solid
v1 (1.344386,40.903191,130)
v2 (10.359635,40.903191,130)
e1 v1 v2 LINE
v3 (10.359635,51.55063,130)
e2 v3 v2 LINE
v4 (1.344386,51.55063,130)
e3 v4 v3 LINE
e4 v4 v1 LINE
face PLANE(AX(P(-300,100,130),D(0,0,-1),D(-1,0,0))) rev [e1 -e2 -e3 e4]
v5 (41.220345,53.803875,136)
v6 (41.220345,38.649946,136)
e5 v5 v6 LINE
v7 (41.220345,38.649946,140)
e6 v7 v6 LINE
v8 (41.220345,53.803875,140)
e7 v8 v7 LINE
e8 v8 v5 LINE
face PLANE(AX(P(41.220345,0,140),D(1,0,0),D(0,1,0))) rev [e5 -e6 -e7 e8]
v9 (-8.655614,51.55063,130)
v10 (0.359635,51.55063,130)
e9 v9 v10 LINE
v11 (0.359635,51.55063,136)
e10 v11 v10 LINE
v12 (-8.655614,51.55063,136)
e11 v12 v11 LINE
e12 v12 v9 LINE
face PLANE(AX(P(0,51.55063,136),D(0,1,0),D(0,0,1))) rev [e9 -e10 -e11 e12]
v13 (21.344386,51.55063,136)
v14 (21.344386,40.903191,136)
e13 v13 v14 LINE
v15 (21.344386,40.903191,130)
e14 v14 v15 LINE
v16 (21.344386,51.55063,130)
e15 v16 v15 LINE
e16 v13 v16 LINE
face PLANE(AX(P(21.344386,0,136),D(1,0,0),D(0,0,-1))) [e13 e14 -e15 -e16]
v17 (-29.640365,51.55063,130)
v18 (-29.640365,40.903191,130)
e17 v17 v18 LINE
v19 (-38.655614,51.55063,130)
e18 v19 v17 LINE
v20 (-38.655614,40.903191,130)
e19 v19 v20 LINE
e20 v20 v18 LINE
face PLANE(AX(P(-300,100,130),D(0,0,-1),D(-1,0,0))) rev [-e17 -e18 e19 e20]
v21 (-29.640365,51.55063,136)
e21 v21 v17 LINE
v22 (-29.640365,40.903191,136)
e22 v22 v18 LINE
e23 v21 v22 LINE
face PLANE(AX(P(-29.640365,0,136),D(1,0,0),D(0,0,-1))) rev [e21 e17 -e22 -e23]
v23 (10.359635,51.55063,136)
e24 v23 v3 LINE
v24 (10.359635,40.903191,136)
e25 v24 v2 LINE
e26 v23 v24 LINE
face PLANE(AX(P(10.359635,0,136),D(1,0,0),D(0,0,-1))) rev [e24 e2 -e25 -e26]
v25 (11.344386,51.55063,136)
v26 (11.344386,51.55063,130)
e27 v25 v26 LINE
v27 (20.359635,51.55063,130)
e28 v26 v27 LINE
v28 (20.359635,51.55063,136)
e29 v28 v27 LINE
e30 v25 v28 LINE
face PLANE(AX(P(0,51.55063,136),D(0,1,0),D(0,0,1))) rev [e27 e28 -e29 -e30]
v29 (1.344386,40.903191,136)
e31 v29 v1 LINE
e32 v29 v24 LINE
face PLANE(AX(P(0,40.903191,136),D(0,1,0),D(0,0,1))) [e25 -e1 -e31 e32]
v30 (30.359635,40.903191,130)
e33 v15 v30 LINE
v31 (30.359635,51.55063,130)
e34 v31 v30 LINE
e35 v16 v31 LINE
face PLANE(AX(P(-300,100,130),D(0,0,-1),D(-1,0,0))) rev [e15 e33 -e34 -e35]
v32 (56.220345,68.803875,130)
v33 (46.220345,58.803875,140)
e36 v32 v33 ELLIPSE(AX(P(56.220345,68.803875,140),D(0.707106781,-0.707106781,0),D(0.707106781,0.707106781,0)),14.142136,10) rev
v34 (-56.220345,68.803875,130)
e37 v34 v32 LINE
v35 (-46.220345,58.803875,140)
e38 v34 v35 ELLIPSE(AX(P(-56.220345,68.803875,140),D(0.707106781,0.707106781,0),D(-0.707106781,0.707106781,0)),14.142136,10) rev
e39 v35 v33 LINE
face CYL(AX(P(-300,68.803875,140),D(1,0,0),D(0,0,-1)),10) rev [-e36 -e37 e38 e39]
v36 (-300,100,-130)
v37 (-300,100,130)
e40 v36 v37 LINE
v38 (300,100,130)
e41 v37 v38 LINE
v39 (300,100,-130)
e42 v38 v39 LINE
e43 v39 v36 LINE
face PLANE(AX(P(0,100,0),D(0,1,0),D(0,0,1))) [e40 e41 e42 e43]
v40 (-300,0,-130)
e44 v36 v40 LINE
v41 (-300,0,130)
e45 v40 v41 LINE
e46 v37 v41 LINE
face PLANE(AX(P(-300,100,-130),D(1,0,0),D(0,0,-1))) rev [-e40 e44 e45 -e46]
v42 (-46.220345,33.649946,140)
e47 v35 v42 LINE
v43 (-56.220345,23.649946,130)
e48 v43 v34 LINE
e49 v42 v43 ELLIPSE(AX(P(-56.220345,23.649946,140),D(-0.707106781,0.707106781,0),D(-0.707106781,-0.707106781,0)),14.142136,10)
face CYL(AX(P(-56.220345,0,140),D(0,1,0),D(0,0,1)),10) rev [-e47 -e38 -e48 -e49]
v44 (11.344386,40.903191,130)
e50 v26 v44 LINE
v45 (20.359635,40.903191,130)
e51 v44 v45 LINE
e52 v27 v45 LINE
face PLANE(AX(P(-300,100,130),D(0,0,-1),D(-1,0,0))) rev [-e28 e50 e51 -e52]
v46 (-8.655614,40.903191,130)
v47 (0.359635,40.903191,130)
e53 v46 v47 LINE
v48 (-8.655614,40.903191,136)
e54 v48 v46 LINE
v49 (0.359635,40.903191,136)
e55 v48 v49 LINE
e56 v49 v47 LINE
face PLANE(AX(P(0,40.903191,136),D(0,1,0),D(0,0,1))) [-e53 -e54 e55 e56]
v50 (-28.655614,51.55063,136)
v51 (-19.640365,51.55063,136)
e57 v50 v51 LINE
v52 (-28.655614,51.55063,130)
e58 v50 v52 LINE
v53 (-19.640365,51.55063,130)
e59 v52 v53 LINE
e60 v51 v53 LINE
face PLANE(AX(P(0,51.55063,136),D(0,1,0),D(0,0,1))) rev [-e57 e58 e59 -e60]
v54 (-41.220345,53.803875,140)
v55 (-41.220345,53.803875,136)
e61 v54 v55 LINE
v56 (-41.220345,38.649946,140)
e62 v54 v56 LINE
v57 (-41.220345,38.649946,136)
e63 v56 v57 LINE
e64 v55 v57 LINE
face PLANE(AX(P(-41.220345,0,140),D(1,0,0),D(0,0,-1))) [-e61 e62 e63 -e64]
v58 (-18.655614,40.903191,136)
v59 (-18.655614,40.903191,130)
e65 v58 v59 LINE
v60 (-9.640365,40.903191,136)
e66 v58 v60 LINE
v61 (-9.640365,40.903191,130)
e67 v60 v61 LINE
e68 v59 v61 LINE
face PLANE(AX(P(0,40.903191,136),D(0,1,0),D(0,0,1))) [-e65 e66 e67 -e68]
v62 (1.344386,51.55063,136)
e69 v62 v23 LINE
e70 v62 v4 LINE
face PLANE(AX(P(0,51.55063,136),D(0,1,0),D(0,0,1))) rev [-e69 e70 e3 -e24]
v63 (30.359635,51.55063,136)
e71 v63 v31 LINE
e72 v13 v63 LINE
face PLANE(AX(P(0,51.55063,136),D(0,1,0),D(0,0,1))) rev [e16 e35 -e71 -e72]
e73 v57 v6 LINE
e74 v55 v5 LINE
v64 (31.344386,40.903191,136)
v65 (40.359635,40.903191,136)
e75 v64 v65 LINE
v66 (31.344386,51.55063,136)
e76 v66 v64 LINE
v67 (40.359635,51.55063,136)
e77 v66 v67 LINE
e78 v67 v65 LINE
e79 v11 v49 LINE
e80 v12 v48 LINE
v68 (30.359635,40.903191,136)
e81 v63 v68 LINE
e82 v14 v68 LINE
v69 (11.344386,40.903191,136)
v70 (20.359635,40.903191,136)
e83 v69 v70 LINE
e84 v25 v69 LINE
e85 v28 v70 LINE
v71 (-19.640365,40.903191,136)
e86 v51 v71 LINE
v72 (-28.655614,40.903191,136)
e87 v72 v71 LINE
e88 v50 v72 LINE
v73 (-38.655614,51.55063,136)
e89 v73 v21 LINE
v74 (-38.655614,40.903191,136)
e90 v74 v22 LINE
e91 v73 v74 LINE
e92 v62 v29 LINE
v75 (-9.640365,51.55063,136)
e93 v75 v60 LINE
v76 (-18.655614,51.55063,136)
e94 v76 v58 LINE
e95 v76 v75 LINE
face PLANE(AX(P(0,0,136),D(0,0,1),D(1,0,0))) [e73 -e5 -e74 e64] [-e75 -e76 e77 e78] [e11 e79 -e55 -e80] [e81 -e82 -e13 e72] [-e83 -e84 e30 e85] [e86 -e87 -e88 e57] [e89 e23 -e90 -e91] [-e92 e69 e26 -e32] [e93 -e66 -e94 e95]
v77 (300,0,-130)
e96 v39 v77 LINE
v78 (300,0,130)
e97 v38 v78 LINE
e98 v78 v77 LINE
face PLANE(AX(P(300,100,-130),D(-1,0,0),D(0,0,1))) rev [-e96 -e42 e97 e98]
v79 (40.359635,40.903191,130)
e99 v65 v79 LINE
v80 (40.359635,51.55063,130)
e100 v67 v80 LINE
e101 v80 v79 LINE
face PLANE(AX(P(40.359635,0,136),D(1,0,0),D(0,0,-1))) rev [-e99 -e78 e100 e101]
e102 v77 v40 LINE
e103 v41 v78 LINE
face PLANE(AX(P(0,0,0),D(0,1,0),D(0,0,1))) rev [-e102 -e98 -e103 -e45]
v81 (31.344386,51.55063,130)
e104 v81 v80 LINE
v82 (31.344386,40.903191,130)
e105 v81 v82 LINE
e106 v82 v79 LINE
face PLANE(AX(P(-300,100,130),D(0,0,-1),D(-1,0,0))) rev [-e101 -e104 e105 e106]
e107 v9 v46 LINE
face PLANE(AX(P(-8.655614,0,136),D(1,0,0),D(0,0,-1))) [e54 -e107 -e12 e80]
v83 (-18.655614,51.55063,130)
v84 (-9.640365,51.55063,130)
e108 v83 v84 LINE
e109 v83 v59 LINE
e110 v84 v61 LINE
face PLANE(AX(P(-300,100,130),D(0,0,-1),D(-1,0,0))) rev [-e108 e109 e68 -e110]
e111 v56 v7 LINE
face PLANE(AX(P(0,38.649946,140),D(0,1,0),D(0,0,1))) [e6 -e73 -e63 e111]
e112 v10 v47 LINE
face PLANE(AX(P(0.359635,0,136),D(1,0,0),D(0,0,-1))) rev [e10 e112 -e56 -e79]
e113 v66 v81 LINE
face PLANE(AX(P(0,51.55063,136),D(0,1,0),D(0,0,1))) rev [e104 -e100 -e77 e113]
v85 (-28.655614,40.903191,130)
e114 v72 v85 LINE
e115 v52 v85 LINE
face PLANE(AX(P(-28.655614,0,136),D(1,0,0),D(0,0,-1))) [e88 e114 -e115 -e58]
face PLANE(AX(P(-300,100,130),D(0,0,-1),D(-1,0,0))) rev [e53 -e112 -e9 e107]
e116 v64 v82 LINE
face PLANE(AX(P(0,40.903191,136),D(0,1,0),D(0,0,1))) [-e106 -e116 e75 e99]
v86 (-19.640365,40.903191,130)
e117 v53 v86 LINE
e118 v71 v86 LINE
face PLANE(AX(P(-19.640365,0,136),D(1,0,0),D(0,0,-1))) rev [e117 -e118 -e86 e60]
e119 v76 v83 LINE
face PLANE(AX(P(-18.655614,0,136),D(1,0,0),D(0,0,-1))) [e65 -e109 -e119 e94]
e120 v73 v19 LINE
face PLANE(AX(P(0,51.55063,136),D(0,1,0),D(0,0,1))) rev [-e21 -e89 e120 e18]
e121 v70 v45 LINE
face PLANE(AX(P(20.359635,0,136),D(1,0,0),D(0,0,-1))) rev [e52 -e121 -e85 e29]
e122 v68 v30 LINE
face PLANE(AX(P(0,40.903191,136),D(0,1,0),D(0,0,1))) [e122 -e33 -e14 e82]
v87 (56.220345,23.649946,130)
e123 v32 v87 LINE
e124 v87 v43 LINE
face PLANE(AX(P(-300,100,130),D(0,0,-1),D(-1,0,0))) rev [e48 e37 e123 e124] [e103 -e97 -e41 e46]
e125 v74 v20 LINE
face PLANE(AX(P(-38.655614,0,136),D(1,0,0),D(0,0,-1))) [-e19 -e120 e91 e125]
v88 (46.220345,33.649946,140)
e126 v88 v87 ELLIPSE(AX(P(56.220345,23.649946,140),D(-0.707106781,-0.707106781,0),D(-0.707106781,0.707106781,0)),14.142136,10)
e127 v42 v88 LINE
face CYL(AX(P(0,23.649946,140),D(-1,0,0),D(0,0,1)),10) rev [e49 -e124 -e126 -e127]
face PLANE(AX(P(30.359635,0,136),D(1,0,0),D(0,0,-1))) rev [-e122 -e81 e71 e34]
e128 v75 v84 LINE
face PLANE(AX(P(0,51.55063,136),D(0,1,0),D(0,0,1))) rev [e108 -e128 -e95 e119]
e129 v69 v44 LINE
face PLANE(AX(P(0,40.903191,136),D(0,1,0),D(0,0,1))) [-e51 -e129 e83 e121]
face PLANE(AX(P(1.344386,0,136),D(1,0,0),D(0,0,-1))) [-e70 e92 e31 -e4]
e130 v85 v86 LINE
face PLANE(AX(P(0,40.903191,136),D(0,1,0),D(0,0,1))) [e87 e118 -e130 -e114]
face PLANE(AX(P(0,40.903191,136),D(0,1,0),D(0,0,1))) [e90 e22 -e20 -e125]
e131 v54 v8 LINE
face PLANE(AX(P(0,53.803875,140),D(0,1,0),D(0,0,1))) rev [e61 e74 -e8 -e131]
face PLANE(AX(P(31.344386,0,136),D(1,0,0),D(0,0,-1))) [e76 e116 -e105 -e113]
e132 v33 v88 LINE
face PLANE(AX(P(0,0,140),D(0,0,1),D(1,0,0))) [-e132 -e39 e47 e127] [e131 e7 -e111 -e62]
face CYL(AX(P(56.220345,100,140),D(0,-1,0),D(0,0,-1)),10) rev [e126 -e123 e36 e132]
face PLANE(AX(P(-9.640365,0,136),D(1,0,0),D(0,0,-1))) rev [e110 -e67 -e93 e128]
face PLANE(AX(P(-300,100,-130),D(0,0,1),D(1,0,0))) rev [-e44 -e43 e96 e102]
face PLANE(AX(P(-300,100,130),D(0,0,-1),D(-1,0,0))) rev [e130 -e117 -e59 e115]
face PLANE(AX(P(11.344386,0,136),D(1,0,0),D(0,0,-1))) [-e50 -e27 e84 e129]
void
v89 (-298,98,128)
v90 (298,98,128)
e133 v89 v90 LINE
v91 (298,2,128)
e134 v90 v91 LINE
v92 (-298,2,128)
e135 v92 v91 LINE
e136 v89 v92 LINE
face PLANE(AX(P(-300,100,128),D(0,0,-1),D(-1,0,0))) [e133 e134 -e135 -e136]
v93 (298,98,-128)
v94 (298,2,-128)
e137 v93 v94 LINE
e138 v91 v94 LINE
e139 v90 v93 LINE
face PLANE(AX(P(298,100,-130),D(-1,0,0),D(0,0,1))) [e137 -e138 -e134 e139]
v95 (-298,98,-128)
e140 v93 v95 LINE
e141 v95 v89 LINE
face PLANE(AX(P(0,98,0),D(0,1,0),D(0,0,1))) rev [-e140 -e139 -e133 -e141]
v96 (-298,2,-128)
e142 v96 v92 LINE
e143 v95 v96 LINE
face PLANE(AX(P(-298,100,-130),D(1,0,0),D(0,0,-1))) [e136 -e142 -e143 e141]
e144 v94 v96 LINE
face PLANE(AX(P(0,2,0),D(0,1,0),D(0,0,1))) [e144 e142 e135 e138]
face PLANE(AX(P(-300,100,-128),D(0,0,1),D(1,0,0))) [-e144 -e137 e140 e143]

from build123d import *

# Parameters (mm, degrees)
SKETCH1_W           = 600
SKETCH1_H           = 260
BOSS_EXTRUDE1_DEPTH = 100
SHELL1_T            = 2
SKETCH2_W           = 92.440689116
SKETCH2_H           = 25.153929011
SKETCH2_W_2         = 82.440689116
SKETCH2_H_2         = 15.153929011
BOSS_EXTRUDE2_DEPTH = 10
SKETCH2_3_W         = 82.440689116
SKETCH2_3_H         = 15.153929011
SKETCH2_3_W_2       = 9.01524931
SKETCH2_3_H_2       = 10.647439476
BOSS_EXTRUDE3_DEPTH = 6
FILLET1_R           = 10


with BuildPart() as part:
    # Sketch1 → Boss-Extrude1 (new body)
    with BuildSketch(Plane(origin=(0, 0, 0), x_dir=(1, 0, 0), z_dir=(0, 1, 0))):
        Rectangle(SKETCH1_W, SKETCH1_H)
    extrude(amount=BOSS_EXTRUDE1_DEPTH)

    # Shell1 (no face opened: a closed hollow body)
    add(offset(amount=-SHELL1_T, mode=Mode.PRIVATE), mode=Mode.SUBTRACT)

    # Sketch2 → Boss-Extrude2 (add)
    with BuildSketch(Plane.XY.offset(130)):
        with Locations((0, 46.226910649)):
            Rectangle(SKETCH2_W, SKETCH2_H)
        with Locations((0, 46.226910649)):
            Rectangle(SKETCH2_W_2, SKETCH2_H_2, mode=Mode.SUBTRACT)
    extrude(amount=BOSS_EXTRUDE2_DEPTH)

    # Sketch2<3> → Boss-Extrude3 (add)
    with BuildSketch(Plane.XY.offset(130)):
        with Locations((0, 46.226910649)):
            Rectangle(SKETCH2_3_W, SKETCH2_3_H)
        with Locations((35.85201026, 46.226910648)):
            Rectangle(SKETCH2_3_W_2, SKETCH2_3_H_2, mode=Mode.SUBTRACT)
        with Locations((25.85201026, 46.226910648)):
            Rectangle(SKETCH2_3_W_2, SKETCH2_3_H_2, mode=Mode.SUBTRACT)
        with Locations((15.85201026, 46.226910648)):
            Rectangle(SKETCH2_3_W_2, SKETCH2_3_H_2, mode=Mode.SUBTRACT)
        with Locations((5.85201026, 46.226910648)):
            Rectangle(SKETCH2_3_W_2, SKETCH2_3_H_2, mode=Mode.SUBTRACT)
        with Locations((-4.14798974, 46.226910648)):
            Rectangle(SKETCH2_3_W_2, SKETCH2_3_H_2, mode=Mode.SUBTRACT)
        with Locations((-14.14798974, 46.226910648)):
            Rectangle(SKETCH2_3_W_2, SKETCH2_3_H_2, mode=Mode.SUBTRACT)
        with Locations((-24.14798974, 46.226910648)):
            Rectangle(SKETCH2_3_W_2, SKETCH2_3_H_2, mode=Mode.SUBTRACT)
        with Locations((-34.14798974, 46.226910648)):
            Rectangle(SKETCH2_3_W_2, SKETCH2_3_H_2, mode=Mode.SUBTRACT)
    extrude(amount=BOSS_EXTRUDE3_DEPTH)

    # Fillet1
    fillet1_edges = [part.edges().sort_by_distance(p)[0] for p in [
        (46.220344558, 46.226910648, 130),
        (0, 58.803875154, 130),
        (-46.220344558, 46.226910648, 130),
        (0, 33.649946143, 130),
    ]]
    fillet(fillet1_edges, radius=FILLET1_R - 0.0001)  # a hair under: the kernel refuses the full size


solid = part.part
